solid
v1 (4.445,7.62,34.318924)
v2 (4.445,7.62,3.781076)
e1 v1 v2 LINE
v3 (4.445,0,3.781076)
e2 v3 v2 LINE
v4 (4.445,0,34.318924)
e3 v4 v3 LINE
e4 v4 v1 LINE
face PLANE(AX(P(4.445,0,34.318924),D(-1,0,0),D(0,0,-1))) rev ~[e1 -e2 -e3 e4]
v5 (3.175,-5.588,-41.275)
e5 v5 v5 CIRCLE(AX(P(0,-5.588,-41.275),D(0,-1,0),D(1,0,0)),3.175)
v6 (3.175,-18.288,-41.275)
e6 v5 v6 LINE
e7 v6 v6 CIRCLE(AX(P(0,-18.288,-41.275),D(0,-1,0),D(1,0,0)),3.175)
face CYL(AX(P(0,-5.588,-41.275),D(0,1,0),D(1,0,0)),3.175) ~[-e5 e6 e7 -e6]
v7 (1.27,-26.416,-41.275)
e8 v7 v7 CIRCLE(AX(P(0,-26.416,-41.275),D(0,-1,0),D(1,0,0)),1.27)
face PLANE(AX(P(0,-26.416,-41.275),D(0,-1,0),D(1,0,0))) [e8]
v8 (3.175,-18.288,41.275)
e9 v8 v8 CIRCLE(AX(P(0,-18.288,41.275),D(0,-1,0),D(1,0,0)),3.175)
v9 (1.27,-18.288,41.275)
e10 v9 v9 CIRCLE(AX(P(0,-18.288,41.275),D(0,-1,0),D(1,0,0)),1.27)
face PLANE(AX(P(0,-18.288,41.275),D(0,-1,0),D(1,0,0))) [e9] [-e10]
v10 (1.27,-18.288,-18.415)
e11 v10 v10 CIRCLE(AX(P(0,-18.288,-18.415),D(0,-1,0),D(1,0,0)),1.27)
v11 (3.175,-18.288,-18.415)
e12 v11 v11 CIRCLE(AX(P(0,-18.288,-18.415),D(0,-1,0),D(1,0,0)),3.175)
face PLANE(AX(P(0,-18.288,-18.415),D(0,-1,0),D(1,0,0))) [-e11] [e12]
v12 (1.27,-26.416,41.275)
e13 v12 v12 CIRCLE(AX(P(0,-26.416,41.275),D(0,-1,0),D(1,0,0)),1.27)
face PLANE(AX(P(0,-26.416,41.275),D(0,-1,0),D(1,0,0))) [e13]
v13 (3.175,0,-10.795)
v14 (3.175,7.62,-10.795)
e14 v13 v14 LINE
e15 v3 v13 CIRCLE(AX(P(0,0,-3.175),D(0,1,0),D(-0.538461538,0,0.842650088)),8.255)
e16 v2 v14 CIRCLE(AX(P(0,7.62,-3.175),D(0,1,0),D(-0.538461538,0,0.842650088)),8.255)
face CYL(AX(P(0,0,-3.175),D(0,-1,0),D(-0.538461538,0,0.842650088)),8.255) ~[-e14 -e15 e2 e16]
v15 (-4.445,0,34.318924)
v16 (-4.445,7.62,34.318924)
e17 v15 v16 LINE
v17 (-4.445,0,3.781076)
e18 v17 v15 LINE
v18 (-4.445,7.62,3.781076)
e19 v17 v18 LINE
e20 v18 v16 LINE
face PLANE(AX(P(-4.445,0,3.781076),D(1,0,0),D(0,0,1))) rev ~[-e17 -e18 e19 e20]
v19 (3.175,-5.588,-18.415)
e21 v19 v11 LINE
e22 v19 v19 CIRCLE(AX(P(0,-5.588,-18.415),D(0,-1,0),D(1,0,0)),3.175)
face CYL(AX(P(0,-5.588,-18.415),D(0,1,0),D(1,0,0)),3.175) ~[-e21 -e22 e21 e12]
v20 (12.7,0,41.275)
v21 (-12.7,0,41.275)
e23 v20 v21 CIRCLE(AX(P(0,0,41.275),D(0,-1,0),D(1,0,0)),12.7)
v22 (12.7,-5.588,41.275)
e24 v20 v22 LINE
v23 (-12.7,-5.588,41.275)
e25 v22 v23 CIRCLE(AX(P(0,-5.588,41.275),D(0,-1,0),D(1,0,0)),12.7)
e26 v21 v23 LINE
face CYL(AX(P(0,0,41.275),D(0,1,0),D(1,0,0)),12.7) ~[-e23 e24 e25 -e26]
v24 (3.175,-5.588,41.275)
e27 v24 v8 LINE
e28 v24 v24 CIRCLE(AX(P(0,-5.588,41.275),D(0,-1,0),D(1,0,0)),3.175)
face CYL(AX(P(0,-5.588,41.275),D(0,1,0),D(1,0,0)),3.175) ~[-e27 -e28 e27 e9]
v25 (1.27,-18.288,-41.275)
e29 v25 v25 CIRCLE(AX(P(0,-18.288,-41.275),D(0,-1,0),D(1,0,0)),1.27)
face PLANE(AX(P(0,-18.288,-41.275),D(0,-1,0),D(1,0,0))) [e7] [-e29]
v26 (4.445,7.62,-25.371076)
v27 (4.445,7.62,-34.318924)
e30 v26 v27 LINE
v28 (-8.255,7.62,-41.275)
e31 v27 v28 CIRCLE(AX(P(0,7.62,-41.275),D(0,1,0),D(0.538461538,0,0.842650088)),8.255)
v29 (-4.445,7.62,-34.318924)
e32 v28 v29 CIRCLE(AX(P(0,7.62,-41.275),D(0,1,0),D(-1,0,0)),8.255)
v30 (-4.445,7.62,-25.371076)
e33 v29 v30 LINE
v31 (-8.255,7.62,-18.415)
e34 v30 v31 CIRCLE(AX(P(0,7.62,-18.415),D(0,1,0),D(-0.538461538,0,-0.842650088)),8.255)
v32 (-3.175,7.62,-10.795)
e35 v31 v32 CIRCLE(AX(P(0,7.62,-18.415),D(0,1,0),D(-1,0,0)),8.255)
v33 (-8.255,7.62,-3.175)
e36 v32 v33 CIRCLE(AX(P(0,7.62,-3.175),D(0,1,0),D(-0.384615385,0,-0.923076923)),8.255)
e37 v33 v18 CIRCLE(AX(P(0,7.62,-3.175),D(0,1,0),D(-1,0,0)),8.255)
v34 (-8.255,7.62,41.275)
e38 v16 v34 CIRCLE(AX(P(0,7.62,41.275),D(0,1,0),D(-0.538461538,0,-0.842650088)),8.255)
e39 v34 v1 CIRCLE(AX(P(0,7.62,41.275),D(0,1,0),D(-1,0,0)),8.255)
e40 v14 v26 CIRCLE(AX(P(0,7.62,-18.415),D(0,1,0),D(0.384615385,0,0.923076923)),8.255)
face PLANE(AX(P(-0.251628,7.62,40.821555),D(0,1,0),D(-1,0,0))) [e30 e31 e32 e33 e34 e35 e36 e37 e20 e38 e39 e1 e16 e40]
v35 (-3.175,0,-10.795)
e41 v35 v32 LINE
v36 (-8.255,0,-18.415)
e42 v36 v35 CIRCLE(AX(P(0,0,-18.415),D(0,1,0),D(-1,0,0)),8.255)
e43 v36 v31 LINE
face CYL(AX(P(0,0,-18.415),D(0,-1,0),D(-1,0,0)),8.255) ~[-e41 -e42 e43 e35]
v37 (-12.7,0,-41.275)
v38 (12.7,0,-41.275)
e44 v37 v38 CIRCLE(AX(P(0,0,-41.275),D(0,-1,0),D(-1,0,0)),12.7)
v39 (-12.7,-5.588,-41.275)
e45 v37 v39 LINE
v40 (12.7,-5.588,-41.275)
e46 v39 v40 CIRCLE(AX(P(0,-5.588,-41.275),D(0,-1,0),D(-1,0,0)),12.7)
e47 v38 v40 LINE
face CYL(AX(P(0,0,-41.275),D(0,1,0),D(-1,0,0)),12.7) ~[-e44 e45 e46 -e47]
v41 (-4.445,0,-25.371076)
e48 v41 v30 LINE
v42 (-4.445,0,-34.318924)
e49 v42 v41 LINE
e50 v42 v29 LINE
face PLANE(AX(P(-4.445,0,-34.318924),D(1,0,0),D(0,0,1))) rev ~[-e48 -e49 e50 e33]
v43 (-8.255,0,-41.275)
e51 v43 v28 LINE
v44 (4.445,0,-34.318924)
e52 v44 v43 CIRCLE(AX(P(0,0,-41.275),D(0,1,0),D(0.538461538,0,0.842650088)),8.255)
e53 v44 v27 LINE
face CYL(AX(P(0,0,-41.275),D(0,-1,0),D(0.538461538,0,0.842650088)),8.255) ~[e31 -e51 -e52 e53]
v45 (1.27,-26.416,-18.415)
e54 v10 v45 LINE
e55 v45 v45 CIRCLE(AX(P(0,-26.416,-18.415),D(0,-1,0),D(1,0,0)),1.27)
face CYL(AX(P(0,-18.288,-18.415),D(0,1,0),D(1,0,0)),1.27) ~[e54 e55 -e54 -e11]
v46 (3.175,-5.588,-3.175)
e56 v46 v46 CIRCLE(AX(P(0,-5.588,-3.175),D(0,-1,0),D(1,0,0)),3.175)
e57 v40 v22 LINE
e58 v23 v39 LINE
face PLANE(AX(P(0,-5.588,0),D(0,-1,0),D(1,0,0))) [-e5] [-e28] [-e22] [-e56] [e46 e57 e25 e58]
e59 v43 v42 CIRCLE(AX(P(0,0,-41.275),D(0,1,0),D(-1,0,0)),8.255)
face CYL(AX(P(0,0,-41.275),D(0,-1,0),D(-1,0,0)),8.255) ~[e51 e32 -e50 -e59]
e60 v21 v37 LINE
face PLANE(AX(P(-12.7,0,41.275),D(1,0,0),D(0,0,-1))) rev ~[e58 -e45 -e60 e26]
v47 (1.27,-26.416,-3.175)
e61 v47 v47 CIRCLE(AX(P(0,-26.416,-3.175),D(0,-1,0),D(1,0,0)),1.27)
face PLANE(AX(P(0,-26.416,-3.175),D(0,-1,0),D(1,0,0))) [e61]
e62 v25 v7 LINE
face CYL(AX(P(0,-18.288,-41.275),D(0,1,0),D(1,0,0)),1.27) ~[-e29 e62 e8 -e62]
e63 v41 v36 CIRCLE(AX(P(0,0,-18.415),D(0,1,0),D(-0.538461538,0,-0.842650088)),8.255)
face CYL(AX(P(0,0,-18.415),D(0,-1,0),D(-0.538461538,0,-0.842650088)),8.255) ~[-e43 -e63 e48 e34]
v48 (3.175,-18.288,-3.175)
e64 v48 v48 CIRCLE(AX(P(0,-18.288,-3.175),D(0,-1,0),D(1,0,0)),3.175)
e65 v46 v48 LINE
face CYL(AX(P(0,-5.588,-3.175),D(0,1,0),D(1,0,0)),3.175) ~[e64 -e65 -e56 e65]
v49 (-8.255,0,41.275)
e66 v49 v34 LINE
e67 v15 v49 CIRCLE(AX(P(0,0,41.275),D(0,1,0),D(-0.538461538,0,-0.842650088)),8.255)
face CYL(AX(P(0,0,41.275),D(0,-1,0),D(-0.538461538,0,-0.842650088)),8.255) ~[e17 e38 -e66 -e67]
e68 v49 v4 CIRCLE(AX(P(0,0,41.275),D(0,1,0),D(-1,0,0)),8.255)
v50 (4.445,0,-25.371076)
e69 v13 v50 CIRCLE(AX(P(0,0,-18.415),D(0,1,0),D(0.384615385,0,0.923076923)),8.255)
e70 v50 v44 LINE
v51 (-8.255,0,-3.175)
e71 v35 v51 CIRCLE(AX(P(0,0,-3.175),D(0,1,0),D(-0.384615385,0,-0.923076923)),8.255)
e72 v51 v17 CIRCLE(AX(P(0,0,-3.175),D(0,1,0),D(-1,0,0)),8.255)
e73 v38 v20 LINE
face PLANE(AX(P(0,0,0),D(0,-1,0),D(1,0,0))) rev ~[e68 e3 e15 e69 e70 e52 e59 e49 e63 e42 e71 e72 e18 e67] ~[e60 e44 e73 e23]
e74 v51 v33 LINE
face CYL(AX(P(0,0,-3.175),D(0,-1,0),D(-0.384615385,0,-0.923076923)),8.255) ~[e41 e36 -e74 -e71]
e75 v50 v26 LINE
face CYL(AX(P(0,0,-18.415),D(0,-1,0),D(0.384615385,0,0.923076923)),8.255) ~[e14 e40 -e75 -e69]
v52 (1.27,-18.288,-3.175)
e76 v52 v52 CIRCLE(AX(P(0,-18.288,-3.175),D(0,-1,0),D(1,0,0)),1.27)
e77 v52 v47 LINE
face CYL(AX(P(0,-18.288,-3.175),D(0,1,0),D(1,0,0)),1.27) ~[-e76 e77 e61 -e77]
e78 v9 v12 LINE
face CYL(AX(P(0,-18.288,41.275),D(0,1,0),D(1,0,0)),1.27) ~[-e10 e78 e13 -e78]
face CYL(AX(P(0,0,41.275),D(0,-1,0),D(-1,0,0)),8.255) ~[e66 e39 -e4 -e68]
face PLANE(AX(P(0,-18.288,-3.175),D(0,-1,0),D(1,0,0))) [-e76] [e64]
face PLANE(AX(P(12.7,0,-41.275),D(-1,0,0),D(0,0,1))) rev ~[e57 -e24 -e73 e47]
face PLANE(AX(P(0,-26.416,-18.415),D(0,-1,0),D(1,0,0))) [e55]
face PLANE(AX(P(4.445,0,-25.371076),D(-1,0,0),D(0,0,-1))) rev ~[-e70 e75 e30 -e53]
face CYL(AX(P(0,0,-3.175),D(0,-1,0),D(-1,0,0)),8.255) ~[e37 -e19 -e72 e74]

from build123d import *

# Parameters (mm, degrees)
F1_DEPTH = 5.588
F3_DEPTH = 7.62
F4_R     = 3.175
F5_DEPTH = 12.7
F6_R     = 1.27
F7_DEPTH = 8.128


with BuildPart() as f1:
    # F0 (on Front) → F1 (new body)
    with BuildSketch(Plane.XZ):
        with BuildLine():
            Line((12.7, -41.275), (12.7, 41.275))
            ThreePointArc((12.7, 41.275), (0, 53.975), (-12.7, 41.275))
            Line((-12.7, 41.275), (-12.7, -41.275))
            ThreePointArc((-12.7, -41.275), (0, -53.975), (12.7, -41.275))
        make_face()
    extrude(amount=F1_DEPTH)

    # F2 (on face) → F3 (join)
    with BuildSketch(Plane(origin=(0, 0, 0), x_dir=(-1, 0, 0), z_dir=(0, 1, 0))):
        with BuildLine():
            ThreePointArc((4.445, 34.3189235197), (7.2401139494, 37.309426271), (8.255, 41.275))
            ThreePointArc((8.255, 41.275), (-3.965573729, 48.5151139494), (-4.445, 34.3189235197))
            ThreePointArc((-4.445, 34.3189235197), (0, 33.02), (4.445, 34.3189235197))
        make_face()
        with BuildLine():
            ThreePointArc((4.445, 34.3189235197), (0, 33.02), (-4.445, 34.3189235197))
            Line((-4.445, 34.3189235197), (-4.445, 3.7810764803))
            ThreePointArc((-4.445, 3.7810764803), (0, 5.08), (4.445, 3.7810764803))
            Line((4.445, 3.7810764803), (4.445, 34.3189235197))
        make_face()
        with BuildLine():
            ThreePointArc((4.445, 3.7810764803), (0, 5.08), (-4.445, 3.7810764803))
            ThreePointArc((-4.445, 3.7810764803), (-8.2238434682, -3.89153584), (-3.175, -10.795))
            ThreePointArc((-3.175, -10.795), (0, -10.16), (3.175, -10.795))
            ThreePointArc((3.175, -10.795), (6.8685751798, -7.7540501198), (8.255, -3.175))
            ThreePointArc((8.255, -3.175), (7.2401139494, 0.790573729), (4.445, 3.7810764803))
        make_face()
        with BuildLine():
            ThreePointArc((3.175, -10.795), (0, -11.43), (-3.175, -10.795))
            ThreePointArc((-3.175, -10.795), (-8.2238434682, -17.69846416), (-4.445, -25.3710764803))
            ThreePointArc((-4.445, -25.3710764803), (0, -26.67), (4.445, -25.3710764803))
            ThreePointArc((4.445, -25.3710764803), (7.2401139494, -22.380573729), (8.255, -18.415))
            ThreePointArc((8.255, -18.415), (6.8685751798, -13.8359498802), (3.175, -10.795))
        make_face()
        with BuildLine():
            ThreePointArc((3.175, -10.795), (0, -10.16), (-3.175, -10.795))
            ThreePointArc((-3.175, -10.795), (0, -11.43), (3.175, -10.795))
        make_face()
        with BuildLine():
            ThreePointArc((4.445, -25.3710764803), (0, -26.67), (-4.445, -25.3710764803))
            Line((-4.445, -25.3710764803), (-4.445, -34.3189235197))
            ThreePointArc((-4.445, -34.3189235197), (0, -33.02), (4.445, -34.3189235197))
            Line((4.445, -34.3189235197), (4.445, -25.3710764803))
        make_face()
        with BuildLine():
            ThreePointArc((4.445, -34.3189235197), (0, -33.02), (-4.445, -34.3189235197))
            ThreePointArc((-4.445, -34.3189235197), (-3.965573729, -48.5151139494), (8.255, -41.275))
            ThreePointArc((8.255, -41.275), (7.2401139494, -37.309426271), (4.445, -34.3189235197))
        make_face()
    extrude(amount=F3_DEPTH)

    # F4 (on face) → F5 (join)
    with BuildSketch(Plane.XZ.offset(5.588)):
        with Locations((0, -41.275)):
            Circle(F4_R)
        with Locations((0, 41.275)):
            Circle(F4_R)
        with Locations((0, -3.175)):
            Circle(F4_R)
        with Locations((0, -18.415)):
            Circle(F4_R)
    extrude(amount=F5_DEPTH)

    # F6 (on face) → F7 (join)
    with BuildSketch(Plane.XZ.offset(18.288)):
        with Locations((0, 41.275)):
            Circle(F6_R)
        with Locations((0, -3.175)):
            Circle(F6_R)
        with Locations((0, -18.415)):
            Circle(F6_R)
        with Locations((0, -41.275)):
            Circle(F6_R)
    extrude(amount=F7_DEPTH)


solid = f1.part
